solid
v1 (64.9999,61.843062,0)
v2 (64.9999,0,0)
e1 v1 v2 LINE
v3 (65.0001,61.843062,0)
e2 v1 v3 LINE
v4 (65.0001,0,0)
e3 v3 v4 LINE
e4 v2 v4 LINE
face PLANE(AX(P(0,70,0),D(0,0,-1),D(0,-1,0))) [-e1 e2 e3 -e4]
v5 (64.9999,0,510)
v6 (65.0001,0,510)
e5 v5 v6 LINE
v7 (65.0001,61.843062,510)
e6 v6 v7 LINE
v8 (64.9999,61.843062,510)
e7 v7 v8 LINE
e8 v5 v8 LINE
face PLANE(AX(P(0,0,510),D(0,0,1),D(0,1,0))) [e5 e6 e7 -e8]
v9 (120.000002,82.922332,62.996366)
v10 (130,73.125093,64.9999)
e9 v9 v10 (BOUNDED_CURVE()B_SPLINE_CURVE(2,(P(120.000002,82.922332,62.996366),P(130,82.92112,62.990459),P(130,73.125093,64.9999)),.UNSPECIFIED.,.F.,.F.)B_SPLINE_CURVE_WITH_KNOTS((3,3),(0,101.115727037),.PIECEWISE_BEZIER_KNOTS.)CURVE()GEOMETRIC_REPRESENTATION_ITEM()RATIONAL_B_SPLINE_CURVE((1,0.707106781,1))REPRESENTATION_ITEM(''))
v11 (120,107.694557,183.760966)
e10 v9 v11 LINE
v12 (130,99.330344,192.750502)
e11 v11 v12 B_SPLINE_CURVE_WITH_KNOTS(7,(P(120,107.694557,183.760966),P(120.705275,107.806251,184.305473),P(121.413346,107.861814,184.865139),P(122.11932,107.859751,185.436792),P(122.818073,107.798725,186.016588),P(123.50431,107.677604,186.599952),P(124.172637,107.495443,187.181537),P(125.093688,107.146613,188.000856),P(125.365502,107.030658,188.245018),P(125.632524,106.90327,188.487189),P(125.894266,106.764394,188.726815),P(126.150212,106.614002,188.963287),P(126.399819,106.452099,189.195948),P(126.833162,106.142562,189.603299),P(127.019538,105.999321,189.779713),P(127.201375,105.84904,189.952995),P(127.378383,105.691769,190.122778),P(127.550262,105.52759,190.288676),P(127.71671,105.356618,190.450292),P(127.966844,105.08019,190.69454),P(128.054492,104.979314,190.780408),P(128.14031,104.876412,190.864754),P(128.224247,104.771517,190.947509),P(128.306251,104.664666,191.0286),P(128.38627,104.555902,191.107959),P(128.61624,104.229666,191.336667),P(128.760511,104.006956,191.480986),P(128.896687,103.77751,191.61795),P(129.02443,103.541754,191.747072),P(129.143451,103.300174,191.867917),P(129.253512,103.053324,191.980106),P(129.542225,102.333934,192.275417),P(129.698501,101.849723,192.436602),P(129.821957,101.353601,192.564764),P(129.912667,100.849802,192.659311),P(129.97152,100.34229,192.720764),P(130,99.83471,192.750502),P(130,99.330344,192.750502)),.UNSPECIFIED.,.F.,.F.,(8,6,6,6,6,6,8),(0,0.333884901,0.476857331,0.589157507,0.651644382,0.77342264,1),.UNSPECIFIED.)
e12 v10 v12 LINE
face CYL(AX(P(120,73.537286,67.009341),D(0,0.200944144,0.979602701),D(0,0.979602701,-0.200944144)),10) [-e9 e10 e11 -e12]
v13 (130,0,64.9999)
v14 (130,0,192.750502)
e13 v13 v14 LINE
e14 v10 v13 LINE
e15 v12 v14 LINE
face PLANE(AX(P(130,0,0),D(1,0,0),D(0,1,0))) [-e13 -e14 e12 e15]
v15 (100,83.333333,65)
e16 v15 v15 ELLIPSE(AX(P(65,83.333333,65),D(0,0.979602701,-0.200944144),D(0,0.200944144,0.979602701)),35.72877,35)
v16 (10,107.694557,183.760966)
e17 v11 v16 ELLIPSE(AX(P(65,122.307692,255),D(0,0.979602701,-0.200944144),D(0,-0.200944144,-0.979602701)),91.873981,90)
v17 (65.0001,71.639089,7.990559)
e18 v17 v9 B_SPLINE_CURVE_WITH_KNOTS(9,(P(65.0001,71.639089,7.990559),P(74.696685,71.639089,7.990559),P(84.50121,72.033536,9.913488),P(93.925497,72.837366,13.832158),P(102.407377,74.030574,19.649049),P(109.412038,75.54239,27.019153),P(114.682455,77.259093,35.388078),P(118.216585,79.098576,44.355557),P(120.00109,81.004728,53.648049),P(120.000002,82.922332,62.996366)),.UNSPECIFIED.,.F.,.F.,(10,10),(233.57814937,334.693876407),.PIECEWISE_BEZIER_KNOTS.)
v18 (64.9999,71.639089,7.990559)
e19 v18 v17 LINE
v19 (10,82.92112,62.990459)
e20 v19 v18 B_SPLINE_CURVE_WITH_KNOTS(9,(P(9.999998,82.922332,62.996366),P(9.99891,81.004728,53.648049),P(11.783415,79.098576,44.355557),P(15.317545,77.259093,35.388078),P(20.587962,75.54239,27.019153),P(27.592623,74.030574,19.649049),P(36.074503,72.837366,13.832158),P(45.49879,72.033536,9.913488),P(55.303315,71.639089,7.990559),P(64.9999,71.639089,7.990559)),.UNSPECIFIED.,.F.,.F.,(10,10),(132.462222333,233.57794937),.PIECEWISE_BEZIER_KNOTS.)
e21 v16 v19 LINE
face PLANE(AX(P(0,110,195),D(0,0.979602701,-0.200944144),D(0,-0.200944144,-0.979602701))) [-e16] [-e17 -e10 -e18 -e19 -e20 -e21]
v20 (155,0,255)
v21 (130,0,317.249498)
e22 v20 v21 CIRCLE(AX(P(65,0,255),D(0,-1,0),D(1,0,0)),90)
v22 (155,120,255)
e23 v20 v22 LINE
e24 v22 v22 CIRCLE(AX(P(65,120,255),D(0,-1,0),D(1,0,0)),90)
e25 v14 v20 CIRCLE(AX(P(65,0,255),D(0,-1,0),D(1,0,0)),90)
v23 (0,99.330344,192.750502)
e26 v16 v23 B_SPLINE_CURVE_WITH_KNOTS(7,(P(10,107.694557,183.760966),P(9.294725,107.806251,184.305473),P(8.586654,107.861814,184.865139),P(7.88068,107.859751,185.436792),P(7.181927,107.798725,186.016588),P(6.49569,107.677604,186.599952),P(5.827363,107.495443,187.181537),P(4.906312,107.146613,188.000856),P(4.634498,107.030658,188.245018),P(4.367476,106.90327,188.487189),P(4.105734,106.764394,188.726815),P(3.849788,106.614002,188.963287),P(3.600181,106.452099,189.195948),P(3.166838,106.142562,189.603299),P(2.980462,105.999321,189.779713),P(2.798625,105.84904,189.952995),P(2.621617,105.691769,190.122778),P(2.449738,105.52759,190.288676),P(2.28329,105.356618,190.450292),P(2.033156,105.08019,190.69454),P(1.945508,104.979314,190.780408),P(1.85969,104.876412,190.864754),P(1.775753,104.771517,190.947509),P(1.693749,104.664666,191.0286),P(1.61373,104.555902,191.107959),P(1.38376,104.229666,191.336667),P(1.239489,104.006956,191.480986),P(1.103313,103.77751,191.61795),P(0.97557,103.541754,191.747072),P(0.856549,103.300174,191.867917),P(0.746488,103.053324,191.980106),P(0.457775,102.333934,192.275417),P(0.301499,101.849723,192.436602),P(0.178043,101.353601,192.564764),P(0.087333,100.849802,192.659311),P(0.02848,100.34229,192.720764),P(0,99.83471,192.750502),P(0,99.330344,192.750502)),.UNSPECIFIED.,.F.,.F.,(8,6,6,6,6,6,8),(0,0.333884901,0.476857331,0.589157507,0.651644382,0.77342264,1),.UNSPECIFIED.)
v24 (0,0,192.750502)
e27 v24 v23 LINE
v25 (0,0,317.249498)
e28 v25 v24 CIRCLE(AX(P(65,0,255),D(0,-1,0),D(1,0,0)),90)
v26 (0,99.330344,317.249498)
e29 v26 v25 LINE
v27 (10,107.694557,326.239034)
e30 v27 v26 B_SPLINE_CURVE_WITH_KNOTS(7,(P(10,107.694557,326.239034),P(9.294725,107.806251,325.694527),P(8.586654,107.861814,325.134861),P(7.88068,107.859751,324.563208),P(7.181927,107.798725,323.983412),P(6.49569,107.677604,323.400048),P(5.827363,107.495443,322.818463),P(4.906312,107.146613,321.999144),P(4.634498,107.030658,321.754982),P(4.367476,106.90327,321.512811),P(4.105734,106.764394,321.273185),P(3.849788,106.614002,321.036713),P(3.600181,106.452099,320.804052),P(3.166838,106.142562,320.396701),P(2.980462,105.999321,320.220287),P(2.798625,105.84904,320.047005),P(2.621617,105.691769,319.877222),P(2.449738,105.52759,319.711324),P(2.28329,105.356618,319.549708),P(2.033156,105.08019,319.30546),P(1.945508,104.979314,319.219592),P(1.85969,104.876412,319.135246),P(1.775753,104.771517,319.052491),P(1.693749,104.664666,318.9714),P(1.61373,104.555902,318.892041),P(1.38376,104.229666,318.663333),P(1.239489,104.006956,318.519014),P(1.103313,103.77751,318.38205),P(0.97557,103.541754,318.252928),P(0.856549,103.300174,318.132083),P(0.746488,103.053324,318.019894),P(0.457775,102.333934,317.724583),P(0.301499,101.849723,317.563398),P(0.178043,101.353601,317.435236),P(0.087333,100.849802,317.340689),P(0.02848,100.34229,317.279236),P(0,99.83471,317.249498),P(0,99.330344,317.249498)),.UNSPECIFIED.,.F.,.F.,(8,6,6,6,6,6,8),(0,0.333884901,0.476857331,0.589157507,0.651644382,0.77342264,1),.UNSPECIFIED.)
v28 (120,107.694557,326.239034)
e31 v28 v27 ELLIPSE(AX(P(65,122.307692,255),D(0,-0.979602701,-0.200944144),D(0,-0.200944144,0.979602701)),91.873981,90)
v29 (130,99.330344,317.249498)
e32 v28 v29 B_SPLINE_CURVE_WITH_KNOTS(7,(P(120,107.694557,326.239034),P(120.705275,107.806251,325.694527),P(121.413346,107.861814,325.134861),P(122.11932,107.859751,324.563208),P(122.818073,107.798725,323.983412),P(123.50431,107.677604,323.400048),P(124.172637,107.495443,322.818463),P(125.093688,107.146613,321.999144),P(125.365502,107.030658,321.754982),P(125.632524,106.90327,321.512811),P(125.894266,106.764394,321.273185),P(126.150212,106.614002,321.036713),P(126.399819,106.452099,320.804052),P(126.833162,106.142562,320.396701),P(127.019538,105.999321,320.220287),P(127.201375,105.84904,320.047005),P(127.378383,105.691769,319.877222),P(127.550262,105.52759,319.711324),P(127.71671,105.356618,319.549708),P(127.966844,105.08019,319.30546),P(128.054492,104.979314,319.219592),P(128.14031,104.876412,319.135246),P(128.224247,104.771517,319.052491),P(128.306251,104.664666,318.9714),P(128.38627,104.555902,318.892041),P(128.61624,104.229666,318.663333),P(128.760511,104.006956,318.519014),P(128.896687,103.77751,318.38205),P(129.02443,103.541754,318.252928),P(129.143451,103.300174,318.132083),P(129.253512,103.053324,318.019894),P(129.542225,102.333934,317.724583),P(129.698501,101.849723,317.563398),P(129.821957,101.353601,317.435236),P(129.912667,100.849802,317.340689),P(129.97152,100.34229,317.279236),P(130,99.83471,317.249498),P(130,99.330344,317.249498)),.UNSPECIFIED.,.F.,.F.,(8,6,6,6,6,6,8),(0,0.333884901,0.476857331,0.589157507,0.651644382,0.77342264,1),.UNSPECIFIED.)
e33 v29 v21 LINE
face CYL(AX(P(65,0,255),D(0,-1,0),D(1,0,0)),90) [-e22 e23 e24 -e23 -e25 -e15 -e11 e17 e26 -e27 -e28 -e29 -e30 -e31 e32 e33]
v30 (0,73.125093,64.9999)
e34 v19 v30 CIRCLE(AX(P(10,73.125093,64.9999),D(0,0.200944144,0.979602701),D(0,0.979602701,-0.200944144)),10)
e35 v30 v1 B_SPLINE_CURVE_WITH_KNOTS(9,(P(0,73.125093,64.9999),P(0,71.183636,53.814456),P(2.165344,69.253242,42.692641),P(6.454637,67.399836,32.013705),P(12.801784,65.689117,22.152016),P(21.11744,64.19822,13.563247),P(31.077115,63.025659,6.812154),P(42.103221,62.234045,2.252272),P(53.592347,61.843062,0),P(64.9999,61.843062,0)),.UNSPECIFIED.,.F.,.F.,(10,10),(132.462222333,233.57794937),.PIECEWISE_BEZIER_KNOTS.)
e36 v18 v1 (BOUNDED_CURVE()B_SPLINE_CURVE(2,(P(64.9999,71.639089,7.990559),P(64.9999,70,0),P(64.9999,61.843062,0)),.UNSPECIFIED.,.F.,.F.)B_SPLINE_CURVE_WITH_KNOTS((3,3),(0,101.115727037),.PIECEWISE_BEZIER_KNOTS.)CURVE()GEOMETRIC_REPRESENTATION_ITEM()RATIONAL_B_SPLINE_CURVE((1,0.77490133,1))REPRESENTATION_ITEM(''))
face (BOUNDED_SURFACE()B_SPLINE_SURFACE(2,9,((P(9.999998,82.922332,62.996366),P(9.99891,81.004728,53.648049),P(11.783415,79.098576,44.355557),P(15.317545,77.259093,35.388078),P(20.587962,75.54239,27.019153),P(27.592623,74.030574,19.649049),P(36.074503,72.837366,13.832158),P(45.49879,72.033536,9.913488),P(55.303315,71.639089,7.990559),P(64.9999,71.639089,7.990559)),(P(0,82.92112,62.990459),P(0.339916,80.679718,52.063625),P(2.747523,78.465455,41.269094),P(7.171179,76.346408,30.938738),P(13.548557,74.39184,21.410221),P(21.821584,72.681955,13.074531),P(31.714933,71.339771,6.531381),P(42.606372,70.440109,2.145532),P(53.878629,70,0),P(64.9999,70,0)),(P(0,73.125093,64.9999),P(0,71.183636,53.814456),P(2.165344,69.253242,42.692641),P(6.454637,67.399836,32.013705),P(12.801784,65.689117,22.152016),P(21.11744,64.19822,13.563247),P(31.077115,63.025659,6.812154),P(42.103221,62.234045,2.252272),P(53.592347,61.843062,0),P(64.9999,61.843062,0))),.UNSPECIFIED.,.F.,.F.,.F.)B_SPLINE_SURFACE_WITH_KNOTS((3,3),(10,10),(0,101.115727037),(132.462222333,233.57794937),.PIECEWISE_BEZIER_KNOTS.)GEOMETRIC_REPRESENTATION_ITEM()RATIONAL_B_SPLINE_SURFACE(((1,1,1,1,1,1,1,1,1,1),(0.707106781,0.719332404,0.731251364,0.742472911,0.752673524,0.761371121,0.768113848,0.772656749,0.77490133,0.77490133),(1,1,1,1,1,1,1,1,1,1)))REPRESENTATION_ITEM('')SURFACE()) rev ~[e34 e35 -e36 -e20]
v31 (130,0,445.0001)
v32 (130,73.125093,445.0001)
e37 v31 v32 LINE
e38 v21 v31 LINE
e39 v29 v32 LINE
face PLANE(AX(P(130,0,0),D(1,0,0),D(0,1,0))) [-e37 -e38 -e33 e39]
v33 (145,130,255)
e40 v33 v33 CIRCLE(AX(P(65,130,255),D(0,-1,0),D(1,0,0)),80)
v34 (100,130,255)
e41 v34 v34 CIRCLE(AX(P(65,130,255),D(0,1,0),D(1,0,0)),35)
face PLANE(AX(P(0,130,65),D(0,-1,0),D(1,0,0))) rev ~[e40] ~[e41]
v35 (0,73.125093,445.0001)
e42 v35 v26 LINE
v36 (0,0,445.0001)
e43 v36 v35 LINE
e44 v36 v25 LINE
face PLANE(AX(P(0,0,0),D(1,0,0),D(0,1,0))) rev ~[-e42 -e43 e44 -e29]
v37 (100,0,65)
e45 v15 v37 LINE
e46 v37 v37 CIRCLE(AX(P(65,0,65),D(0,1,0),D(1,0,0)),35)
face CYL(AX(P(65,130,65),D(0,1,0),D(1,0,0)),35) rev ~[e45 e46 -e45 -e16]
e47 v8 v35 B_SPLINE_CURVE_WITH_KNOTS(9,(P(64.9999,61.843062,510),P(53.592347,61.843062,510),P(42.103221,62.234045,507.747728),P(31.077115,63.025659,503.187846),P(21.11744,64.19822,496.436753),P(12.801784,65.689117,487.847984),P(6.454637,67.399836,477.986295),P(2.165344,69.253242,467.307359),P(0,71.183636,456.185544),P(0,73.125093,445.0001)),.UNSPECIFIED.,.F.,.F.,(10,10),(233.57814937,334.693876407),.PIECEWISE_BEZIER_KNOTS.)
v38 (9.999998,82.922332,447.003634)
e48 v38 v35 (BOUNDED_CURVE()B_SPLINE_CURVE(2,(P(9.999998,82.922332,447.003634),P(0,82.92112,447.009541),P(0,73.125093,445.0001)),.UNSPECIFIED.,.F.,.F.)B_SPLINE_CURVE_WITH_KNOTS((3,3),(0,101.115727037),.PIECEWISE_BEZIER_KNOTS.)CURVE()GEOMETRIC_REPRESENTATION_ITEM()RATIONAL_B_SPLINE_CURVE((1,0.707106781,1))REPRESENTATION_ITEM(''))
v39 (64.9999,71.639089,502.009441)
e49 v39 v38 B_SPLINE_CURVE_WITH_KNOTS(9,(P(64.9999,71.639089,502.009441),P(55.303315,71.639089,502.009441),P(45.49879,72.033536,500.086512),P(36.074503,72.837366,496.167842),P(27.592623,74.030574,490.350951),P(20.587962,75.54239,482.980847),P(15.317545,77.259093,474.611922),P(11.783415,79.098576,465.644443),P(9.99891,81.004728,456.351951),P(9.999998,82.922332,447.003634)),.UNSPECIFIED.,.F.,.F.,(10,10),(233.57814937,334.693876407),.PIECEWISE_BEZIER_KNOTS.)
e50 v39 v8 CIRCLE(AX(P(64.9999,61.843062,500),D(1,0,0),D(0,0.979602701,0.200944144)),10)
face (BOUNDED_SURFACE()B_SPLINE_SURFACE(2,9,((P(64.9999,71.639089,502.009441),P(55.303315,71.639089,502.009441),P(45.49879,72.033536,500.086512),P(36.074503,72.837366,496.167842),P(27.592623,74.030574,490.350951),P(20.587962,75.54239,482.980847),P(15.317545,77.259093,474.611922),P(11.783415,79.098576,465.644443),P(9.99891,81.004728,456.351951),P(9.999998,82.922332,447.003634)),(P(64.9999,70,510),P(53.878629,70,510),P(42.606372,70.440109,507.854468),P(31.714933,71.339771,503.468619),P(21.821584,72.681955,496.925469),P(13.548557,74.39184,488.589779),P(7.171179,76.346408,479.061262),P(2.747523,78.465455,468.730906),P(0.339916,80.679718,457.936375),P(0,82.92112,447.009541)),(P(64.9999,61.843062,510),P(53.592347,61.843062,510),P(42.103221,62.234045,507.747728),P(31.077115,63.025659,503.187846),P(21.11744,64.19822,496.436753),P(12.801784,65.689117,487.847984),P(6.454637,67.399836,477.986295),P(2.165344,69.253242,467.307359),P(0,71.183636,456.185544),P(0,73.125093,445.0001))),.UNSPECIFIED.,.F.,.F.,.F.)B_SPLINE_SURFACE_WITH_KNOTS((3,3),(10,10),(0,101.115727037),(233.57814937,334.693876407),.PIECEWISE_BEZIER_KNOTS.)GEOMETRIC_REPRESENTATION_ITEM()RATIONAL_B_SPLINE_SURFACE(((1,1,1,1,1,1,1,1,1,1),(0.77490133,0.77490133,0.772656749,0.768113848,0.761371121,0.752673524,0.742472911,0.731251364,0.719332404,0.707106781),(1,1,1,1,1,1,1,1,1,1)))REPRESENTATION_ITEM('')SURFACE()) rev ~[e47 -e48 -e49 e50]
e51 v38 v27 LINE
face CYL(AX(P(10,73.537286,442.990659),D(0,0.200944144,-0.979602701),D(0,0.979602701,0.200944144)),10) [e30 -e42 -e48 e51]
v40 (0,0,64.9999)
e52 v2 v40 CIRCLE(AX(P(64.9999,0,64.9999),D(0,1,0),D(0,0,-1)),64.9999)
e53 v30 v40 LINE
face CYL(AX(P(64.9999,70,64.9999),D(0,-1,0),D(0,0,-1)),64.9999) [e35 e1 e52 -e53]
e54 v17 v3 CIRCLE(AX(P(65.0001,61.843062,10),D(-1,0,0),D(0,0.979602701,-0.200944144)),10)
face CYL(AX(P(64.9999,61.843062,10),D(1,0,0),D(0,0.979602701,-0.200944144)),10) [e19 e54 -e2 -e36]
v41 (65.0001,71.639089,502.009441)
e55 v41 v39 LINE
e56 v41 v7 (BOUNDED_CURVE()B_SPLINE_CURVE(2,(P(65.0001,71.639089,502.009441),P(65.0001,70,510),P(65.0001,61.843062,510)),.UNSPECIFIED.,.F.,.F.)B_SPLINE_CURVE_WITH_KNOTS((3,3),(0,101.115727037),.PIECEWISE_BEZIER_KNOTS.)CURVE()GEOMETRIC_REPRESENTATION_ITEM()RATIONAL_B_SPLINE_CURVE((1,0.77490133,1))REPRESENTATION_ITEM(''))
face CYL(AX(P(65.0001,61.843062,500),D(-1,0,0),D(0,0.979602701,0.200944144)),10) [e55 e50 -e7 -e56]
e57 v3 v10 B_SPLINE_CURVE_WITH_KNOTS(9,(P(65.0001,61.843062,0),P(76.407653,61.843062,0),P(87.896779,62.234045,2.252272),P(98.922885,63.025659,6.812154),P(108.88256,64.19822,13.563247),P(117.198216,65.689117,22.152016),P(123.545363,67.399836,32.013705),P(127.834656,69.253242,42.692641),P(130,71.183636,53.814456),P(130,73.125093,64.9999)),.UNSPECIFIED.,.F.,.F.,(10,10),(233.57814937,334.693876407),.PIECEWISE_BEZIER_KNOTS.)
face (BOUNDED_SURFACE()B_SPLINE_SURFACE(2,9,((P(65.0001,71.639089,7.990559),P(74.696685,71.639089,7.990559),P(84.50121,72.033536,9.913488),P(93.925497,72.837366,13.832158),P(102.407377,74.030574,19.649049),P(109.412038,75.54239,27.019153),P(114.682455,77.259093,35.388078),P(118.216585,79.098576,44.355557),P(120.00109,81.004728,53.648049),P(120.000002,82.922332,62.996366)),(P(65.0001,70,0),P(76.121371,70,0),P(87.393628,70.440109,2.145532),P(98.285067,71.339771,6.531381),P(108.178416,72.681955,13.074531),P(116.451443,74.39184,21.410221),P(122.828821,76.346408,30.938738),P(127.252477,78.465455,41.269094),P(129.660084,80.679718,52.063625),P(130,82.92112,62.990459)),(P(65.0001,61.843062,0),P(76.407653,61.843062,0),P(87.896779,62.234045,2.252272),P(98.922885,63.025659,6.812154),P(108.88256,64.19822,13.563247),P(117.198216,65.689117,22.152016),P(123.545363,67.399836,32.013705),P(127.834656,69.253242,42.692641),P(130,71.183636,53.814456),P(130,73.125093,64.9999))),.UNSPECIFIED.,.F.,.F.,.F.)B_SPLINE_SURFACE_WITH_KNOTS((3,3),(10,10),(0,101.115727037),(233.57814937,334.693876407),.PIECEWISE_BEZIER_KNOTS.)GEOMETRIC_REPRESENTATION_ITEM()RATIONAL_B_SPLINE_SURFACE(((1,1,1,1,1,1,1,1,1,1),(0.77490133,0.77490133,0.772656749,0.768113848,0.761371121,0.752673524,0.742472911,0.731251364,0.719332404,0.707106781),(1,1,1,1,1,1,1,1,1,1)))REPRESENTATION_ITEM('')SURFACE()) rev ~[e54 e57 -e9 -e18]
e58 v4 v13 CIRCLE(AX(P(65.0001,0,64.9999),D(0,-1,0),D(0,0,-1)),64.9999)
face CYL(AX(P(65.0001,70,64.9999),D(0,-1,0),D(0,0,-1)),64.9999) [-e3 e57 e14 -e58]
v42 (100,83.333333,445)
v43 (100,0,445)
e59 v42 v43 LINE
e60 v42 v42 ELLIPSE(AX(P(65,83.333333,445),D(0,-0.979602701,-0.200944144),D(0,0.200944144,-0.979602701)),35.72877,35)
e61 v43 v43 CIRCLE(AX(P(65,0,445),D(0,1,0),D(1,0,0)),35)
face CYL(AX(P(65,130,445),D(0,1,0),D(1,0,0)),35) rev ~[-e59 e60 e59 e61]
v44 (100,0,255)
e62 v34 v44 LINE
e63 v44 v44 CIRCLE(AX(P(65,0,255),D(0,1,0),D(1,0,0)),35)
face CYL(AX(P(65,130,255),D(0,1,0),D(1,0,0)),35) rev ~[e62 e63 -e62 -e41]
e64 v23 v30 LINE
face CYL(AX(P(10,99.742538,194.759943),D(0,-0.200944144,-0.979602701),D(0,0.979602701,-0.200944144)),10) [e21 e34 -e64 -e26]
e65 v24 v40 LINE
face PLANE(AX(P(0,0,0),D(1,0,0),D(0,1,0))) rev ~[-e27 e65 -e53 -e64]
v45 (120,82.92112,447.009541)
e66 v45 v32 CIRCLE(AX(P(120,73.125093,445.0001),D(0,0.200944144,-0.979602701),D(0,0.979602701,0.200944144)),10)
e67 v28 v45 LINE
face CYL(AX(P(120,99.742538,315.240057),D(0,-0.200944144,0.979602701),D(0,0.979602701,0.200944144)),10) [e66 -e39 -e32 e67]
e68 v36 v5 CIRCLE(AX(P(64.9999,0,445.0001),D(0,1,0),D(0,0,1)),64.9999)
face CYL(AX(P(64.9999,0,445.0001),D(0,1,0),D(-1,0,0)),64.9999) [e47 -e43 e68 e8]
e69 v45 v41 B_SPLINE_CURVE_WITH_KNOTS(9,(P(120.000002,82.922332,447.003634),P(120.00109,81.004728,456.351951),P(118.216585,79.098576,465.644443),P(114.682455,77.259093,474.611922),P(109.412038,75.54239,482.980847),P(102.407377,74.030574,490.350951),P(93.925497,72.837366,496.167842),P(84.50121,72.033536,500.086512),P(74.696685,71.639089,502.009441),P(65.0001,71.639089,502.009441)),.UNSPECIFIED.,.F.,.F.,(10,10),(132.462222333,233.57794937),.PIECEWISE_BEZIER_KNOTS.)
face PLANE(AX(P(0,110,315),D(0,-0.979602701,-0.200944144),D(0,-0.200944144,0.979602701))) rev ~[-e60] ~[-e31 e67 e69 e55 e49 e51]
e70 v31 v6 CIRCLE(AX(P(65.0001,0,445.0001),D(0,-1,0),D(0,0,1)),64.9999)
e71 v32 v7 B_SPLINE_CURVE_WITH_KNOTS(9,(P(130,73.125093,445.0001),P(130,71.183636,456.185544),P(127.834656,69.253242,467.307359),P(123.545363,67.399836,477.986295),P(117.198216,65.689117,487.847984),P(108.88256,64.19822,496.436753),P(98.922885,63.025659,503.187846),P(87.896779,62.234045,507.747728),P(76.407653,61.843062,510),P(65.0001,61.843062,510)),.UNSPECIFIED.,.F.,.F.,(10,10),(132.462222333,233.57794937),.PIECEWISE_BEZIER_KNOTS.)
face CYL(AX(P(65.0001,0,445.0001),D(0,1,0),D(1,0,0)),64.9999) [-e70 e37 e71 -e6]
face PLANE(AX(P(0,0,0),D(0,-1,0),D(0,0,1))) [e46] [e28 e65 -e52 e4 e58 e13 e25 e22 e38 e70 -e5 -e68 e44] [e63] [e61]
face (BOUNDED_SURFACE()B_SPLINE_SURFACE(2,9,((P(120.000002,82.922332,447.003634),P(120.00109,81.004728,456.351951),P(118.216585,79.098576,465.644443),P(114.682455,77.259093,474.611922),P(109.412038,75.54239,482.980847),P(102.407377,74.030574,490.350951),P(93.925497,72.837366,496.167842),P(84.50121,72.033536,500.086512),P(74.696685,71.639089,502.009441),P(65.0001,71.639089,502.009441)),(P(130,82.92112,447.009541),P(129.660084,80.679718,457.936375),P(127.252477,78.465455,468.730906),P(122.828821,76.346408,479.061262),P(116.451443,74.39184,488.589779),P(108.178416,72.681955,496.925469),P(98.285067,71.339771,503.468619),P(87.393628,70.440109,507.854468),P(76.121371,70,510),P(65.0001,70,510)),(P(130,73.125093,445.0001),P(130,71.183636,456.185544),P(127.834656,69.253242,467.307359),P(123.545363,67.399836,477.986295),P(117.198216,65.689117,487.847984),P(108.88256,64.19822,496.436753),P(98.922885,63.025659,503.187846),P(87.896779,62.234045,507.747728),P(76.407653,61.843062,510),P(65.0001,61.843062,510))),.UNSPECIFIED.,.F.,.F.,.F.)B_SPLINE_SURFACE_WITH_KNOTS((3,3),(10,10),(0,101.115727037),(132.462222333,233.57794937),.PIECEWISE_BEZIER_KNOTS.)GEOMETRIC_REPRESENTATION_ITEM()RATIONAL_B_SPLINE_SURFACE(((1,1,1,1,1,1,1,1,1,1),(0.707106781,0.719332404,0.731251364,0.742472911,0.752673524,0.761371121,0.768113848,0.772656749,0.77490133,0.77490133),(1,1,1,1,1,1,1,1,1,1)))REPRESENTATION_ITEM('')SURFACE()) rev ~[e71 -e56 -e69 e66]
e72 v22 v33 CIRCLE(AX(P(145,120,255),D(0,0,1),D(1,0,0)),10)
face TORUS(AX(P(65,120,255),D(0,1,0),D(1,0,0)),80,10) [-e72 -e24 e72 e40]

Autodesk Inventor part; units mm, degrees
ref_plane "YZ Plane" through (0, 0, 0) normal (1, 0, 0) x (0, 1, 0)
ref_plane "XZ Plane" through (0, 0, 0) normal (0, 1, 0) x (-1, 0, 0)
ref_plane "XY Plane" through (0, 0, 0) normal (0, 0, 1) x (1, 0, 0)
sketch "Sketch5" plane through (0, 0, 0) normal (1, 0, 0) x (0, 1, 0)
  line L0 (0, 0) -> (0, 510)
  line L1 (0, 510) -> (70, 510)
  line L2 (70, 510) -> (70, 0)
  line L3 (70, 0) -> (0, 0)
  line L4 (0, 255) -> (110, 255)
  line L5 (110, 255) -> (110, 315)
  line L6 (110, 315) -> (70, 510)
  line L7 (110, 255) -> (110, 195)
  line L8 (110, 195) -> (70, 0)
  line L9 (0, 345) -> (0, 255)
  dimension "d9" = 510
  dimension "d10" = 70
  dimension "d11" = 510
  dimension "d12" = 110
  dimension "d13" = 60
  dimension "d14" = 60
extrude "Extrusion4" add sketch "Sketch5" along normal blind 130
fillet "Fillet1" radius 65 4 edges at (130, 35, 510) (0, 35, 510) (130, 35, 0) (0, 35, 0)
sketch "Sketch7" plane through (0, 0, 65) normal (0, -1, 0) x (1, 0, 0)
  line L0 (0, -65) -> (0, 190)
  line L1 (0, 130) -> (0, 250) projected
  line L2 (0, 190) -> (65, 190)
  circle A0 centre (65, 190) radius 90
  dimension "d28" = 65
  dimension "d29" = 180
extrude "Extrusion6" add sketch "Sketch7" against normal blind 130
sketch "Sketch8" plane through (65, 130, 255) normal (0, 1, 0) x (1, 0, 0)
  circle A0 centre (0, 0) radius 35
  arc A1 (65, 190) -> (-65, 190) centre (0, 190) ccw projected
  circle A2 centre (0, 190) radius 35
  arc A3 (-65, -190) -> (65, -190) centre (0, -190) ccw projected
  circle A4 centre (0, -190) radius 35
  point P0 (-65, 255)
  dimension "d32" = 70
  dimension "d39" = 70
  dimension "d40" = 70
extrude "Extrusion7" cut sketch "Sketch8" against normal blind 130
thread "Thread1" size "TR70x4" class "7H" standard "ISO Metric Trapezoidal Threads" full length
fillet "Fillet2" radius 10 1 edges at (-25, 130, 255)
fillet "Fillet3" radius 10 6 edges at (110.962, 73.9052, 490.962) (0, 96.4359, 381.1248) (130, 96.4359, 381.1248) (110.962, 73.9052, 19.038) (0, 96.4359, 128.8752) (130, 96.4359, 128.8752)
properties part number "Base Superior"
